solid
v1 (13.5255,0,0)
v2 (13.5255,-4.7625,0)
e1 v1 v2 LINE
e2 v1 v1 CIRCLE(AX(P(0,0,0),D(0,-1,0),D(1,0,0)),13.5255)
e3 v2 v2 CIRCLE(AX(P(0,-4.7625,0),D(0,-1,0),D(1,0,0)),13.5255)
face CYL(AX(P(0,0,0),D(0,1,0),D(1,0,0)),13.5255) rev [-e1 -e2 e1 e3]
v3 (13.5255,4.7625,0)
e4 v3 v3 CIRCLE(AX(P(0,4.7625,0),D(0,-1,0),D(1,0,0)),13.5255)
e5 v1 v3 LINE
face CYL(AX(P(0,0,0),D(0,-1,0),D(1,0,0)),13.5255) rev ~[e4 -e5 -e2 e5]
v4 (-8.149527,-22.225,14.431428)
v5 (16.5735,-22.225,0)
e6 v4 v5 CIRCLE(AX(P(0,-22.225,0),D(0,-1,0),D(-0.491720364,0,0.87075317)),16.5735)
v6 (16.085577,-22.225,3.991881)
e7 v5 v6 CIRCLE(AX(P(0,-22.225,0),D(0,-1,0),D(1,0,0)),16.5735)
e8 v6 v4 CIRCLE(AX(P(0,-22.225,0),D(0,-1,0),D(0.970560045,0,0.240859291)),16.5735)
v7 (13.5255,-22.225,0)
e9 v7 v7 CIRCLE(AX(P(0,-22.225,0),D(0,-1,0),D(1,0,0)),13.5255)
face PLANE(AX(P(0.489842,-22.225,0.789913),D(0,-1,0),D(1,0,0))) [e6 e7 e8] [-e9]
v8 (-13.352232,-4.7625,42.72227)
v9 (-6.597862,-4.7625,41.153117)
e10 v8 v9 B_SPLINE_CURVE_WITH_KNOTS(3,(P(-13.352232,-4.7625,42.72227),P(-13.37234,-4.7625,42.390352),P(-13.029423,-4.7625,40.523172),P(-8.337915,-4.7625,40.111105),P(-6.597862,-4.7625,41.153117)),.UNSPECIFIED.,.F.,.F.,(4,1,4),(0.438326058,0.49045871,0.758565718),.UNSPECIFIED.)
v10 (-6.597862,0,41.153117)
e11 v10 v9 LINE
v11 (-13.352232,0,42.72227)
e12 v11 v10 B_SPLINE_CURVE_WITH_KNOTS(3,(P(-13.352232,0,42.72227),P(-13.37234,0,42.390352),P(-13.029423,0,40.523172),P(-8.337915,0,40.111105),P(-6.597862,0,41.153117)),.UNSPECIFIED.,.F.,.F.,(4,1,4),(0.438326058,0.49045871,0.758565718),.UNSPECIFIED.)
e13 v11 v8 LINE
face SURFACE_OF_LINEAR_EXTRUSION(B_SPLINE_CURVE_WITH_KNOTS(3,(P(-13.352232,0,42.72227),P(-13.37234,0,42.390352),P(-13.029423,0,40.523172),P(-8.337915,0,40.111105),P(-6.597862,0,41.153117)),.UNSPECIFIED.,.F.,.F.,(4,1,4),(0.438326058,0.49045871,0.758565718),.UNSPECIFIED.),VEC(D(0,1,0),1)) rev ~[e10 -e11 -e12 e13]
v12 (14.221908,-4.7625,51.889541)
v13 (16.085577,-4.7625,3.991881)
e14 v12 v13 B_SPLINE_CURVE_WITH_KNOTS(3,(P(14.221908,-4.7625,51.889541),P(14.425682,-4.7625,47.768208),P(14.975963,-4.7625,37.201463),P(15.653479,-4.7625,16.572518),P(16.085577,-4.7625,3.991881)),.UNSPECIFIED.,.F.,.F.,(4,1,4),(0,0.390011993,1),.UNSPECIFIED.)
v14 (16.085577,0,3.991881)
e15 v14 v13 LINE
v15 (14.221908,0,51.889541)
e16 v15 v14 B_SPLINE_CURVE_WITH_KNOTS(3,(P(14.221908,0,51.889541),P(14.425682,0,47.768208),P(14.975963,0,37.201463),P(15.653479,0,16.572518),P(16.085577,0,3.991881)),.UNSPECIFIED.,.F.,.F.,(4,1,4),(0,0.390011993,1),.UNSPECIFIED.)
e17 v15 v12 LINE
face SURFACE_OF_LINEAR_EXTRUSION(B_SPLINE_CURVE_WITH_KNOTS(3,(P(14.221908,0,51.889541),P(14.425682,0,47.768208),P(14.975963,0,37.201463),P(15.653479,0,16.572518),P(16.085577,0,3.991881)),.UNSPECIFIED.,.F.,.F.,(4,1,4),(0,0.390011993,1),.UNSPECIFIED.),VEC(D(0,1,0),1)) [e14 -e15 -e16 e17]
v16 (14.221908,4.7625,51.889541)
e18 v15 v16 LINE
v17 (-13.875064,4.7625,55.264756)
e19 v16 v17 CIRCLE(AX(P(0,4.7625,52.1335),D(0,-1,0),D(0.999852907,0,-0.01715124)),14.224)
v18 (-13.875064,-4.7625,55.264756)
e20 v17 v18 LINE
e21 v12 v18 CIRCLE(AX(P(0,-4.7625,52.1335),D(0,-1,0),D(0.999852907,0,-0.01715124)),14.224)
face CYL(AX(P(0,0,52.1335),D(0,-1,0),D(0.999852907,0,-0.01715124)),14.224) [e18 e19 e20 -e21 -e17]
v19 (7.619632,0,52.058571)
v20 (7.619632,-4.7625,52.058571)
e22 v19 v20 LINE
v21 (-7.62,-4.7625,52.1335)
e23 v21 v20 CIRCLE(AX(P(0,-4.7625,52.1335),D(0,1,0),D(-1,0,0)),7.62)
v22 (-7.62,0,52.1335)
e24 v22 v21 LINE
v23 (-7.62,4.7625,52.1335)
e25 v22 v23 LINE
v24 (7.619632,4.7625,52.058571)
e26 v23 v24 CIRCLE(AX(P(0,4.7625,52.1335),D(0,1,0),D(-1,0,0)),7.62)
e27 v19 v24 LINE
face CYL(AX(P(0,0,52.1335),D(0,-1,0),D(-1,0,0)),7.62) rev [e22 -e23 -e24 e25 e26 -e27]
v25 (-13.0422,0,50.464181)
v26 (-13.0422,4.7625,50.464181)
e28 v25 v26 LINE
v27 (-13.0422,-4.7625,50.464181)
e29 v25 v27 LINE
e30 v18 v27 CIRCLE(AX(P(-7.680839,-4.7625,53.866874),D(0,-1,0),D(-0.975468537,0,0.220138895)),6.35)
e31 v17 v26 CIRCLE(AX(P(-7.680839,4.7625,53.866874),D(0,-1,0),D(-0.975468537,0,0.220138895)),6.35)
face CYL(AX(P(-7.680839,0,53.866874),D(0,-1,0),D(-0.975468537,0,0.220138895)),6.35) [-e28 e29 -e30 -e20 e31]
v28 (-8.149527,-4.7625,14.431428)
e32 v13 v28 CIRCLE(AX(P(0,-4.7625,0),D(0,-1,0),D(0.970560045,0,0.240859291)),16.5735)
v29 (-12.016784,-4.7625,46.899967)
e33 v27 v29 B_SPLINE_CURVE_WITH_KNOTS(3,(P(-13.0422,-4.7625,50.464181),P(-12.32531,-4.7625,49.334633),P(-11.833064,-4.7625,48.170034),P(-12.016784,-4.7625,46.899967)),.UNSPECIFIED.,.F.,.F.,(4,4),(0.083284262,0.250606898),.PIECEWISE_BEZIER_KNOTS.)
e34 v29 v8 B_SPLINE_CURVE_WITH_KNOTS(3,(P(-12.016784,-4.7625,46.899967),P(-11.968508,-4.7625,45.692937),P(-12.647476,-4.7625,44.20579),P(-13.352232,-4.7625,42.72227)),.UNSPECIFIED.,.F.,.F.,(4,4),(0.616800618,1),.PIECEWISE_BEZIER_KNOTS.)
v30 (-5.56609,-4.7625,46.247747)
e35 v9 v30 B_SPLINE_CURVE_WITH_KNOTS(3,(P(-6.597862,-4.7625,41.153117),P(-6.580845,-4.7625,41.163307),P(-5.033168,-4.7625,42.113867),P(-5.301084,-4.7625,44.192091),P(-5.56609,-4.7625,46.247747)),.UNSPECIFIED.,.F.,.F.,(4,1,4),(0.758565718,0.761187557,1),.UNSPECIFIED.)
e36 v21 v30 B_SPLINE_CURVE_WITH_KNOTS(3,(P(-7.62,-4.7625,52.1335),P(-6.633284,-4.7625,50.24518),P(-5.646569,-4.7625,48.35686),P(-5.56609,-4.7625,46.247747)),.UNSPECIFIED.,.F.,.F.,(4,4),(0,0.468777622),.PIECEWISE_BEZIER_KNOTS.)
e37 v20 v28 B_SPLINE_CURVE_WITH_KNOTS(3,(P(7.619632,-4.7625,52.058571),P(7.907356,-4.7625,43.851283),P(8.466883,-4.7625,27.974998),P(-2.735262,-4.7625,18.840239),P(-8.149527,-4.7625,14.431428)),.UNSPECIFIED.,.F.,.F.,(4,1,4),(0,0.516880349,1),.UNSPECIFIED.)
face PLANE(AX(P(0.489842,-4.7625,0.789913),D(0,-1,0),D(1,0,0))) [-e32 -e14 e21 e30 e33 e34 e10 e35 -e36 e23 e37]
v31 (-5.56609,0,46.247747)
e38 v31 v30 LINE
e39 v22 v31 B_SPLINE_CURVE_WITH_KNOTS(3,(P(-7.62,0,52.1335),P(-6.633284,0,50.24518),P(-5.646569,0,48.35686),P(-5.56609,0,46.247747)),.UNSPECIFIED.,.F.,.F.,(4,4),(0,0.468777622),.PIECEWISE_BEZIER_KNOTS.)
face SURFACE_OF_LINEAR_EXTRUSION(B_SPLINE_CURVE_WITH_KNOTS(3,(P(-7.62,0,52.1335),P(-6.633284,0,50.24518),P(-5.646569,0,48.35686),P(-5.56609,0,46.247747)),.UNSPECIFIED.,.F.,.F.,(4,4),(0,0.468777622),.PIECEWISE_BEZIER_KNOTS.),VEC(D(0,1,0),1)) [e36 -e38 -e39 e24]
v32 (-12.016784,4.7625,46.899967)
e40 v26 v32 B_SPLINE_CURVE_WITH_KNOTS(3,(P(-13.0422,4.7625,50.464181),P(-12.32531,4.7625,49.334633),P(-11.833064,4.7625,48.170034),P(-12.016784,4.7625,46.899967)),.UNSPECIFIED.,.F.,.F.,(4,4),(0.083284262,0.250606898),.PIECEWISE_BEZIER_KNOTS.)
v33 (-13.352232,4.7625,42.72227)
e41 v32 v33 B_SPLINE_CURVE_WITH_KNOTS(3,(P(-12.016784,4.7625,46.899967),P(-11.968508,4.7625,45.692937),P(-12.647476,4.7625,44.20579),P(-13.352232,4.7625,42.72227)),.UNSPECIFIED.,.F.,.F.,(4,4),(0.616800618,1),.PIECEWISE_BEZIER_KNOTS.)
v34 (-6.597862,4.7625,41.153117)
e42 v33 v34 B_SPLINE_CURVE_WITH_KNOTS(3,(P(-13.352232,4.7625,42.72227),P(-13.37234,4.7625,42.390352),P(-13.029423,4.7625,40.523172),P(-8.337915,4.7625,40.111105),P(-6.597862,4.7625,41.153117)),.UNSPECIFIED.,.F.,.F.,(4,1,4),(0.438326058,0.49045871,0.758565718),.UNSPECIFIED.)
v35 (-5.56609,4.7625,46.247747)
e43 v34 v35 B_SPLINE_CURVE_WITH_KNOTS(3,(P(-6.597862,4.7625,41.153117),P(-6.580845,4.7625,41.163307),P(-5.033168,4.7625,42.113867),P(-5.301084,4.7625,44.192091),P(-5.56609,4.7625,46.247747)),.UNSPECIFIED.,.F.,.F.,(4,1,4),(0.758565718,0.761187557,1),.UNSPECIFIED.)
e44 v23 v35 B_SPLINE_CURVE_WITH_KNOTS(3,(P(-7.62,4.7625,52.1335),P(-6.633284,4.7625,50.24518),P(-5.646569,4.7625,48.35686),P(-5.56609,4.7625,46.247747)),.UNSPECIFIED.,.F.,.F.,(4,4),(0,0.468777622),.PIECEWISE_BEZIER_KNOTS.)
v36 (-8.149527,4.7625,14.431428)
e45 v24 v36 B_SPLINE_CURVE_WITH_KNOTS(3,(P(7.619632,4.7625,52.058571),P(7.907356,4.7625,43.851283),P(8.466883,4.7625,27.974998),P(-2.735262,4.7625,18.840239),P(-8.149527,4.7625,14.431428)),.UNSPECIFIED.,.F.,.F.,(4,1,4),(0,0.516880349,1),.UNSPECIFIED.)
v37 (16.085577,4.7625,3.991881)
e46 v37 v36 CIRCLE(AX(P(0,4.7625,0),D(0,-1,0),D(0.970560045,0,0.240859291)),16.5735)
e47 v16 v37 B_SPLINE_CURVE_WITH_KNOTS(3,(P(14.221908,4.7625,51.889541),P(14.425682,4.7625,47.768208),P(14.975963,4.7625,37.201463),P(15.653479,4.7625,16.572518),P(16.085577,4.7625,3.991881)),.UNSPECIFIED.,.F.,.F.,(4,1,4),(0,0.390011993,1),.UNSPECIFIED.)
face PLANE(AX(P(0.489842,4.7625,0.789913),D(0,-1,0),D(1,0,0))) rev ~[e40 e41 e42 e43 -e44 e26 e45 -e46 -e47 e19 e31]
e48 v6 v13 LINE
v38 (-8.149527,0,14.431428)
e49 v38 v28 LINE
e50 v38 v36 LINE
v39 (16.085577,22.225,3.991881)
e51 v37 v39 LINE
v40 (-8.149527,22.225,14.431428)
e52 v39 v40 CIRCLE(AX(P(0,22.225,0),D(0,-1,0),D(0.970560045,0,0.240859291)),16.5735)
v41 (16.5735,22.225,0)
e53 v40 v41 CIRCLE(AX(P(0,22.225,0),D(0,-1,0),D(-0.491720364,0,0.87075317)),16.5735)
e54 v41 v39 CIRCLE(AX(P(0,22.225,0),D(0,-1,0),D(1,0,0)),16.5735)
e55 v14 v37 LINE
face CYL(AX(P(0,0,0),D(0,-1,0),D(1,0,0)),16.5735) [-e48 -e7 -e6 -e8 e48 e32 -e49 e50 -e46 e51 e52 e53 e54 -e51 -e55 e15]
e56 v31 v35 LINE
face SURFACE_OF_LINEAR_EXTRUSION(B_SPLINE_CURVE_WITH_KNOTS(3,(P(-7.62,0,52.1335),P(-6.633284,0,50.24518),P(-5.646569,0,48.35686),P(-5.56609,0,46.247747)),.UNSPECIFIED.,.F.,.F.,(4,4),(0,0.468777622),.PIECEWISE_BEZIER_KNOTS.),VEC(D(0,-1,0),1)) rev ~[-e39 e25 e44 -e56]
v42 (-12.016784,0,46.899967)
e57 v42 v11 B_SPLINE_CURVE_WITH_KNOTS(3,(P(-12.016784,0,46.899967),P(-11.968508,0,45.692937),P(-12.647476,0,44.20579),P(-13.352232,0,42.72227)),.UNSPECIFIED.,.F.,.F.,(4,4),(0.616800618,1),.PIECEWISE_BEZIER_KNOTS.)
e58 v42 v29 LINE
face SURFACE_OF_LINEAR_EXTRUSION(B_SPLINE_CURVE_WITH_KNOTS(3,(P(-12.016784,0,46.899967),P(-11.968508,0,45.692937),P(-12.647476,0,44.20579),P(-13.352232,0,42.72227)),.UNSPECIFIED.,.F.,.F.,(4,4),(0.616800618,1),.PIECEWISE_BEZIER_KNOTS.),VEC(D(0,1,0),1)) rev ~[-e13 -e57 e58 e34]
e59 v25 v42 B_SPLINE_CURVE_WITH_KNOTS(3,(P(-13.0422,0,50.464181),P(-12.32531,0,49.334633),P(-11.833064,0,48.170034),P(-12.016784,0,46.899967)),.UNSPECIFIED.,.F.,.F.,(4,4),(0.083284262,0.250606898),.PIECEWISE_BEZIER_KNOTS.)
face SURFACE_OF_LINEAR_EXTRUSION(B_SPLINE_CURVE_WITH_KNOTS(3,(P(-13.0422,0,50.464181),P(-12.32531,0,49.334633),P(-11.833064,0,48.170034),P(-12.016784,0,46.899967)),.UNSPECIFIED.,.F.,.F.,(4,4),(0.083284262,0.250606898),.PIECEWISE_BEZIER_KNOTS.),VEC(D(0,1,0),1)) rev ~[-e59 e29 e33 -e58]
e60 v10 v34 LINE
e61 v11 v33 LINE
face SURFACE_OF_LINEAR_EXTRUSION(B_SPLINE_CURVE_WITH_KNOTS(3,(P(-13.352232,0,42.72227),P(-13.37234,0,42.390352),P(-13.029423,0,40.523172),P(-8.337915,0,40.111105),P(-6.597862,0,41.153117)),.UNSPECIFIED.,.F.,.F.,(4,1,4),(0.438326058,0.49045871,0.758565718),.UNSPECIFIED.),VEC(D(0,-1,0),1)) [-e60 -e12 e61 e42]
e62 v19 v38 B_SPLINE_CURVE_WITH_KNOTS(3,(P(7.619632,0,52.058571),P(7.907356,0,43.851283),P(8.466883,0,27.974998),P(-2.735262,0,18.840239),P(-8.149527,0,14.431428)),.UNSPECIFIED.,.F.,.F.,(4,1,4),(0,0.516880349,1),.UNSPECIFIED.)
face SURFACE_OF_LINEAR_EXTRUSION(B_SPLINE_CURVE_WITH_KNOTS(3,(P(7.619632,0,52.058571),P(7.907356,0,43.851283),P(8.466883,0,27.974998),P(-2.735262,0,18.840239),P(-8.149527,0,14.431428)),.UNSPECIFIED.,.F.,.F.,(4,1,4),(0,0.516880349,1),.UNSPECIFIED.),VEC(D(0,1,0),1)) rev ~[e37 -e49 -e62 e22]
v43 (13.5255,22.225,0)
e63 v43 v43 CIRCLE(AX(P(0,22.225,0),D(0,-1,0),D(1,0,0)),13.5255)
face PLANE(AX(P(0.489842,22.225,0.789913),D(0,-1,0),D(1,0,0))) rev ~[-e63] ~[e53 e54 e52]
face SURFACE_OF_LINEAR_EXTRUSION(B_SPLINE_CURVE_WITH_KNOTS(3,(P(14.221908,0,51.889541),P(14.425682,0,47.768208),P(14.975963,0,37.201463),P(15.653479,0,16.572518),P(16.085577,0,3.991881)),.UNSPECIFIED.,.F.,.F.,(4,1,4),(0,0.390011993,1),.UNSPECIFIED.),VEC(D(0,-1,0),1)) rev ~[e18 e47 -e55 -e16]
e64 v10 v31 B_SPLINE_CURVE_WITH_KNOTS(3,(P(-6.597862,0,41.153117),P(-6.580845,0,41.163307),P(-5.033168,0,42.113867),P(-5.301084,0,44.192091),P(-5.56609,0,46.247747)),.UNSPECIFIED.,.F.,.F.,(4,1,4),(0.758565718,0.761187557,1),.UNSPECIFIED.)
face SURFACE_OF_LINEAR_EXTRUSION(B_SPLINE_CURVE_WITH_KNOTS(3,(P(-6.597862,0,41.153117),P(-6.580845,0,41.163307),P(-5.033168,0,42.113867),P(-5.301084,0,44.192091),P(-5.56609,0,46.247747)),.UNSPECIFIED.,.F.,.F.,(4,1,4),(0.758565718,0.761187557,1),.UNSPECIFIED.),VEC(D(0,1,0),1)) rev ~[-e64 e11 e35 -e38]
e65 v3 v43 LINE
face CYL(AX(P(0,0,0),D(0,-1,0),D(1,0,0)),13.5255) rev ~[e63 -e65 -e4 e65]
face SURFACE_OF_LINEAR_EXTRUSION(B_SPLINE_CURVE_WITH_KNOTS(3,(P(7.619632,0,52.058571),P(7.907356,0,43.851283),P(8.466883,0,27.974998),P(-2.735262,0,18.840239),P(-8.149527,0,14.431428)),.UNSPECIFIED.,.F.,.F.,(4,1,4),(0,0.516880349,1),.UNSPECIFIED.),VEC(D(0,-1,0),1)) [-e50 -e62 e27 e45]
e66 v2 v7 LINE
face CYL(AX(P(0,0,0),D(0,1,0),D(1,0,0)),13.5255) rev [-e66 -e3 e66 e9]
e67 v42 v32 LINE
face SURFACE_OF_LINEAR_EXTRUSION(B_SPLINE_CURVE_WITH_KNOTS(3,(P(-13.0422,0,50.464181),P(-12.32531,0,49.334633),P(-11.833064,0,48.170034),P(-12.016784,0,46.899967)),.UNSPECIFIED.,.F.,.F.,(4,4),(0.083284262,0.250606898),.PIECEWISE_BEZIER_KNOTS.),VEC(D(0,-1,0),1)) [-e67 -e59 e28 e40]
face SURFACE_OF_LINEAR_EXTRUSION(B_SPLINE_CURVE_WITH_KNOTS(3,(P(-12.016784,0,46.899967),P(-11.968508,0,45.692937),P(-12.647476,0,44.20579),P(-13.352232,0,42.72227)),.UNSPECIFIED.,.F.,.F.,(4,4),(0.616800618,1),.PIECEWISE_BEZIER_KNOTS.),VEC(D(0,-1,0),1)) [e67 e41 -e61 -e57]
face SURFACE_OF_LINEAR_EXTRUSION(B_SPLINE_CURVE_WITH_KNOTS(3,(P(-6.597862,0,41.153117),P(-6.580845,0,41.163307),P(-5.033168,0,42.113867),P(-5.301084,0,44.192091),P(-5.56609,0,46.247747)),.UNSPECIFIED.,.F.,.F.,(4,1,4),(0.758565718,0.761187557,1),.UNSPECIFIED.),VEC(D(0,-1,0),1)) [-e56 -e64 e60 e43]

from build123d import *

# Parameters (mm, degrees)
F0_R     = 13.5255
F1_DEPTH = 22.225
F2_DEPTH = 4.7625


with BuildPart() as f1:
    # F0 (on Front) → F1 (new body, symmetric)
    with BuildSketch(Plane.XZ):
        with BuildLine():
            ThreePointArc((16.0855769131, 3.991881464), (6.5567714231, 15.2213550893), (-8.1495274532, 14.4314276681))
            ThreePointArc((-8.1495274532, 14.4314276681), (-8.3550795629, -14.3134044779), (16.5735, 0))
            ThreePointArc((16.5735, 0), (16.4510670052, 2.0107950269), (16.0855769131, 3.991881464))
        make_face()
        Circle(F0_R, mode=Mode.SUBTRACT)
    extrude(amount=F1_DEPTH, both=True)

    # F0 (on Front) → F2 (join, symmetric)
    with BuildSketch(Plane.XZ):
        with BuildLine():
            ThreePointArc((16.0855769131, 3.991881464), (6.5567714231, 15.2213550893), (-8.1495274532, 14.4314276681))
            ThreePointArc((-8.1495274532, 14.4314276681), (-8.3550795629, -14.3134044779), (16.5735, 0))
            ThreePointArc((16.5735, 0), (16.4510670052, 2.0107950269), (16.0855769131, 3.991881464))
        make_face()
        Circle(F0_R, mode=Mode.SUBTRACT)
        with BuildLine():
            add(Edge.make_bspline(
                [(7.6196315943, 52.0585709196), (7.9073561804, 43.8512833929), (8.4668828165, 27.9749976478), (-2.735262235, 18.8402392219), (-8.1495274532, 14.4314276681)],
                knots=[0, 0, 0, 0, 0.5168803488, 1, 1, 1, 1], degree=3))
            ThreePointArc((-8.1495274532, 14.4314276681), (6.5567714231, 15.2213550893), (16.0855769131, 3.991881464))
            add(Edge.make_bspline(
                [(14.2219077444, 51.8895407599), (14.4256822763, 47.7682077132), (14.9759634895, 37.2014626867), (15.653478831, 16.5725180559), (16.0855769131, 3.991881464)],
                knots=[0, 0, 0, 0, 0.3900119934, 1, 1, 1, 1], degree=3))
            ThreePointArc((14.2219077444, 51.8895407599), (1.6964946006, 66.2559672798), (-13.8750644733, 55.2647556367))
            ThreePointArc((-13.8750644733, 55.2647556367), (-13.937377269, 52.7814096229), (-13.0421995878, 50.4641812725))
            add(Edge.make_bspline(
                [(-13.0421995878, 50.4641812725), (-12.3253096001, 49.3346329312), (-11.8330637514, 48.1700341933), (-12.0167843997, 46.8999668956)],
                knots=[0.0832842621, 0.0832842621, 0.0832842621, 0.0832842621, 0.2506068983, 0.2506068983, 0.2506068983, 0.2506068983], degree=3))
            add(Edge.make_bspline(
                [(-12.0167843975, 46.8999668404), (-11.9685081536, 45.6929371066), (-12.6474764459, 44.2057904092), (-13.352232419, 42.7222704399)],
                knots=[0.6168006178, 0.6168006178, 0.6168006178, 0.6168006178, 1, 1, 1, 1], degree=3))
            add(Edge.make_bspline(
                [(-13.352232419, 42.7222704399), (-13.3723404879, 42.3903517549), (-13.0294229695, 40.5231715226), (-8.3379146473, 40.1111053623), (-6.5978615691, 41.1531167984)],
                knots=[0.4383260576, 0.4383260576, 0.4383260576, 0.4383260576, 0.4904587097, 0.7585657185, 0.7585657185, 0.7585657185, 0.7585657185], degree=3))
            add(Edge.make_bspline(
                [(-5.5660903454, 46.2477467954), (-5.5050556705, 44.6482001002), (-5.9652585792, 42.9216600644), (-6.5978615691, 41.1531167984)],
                knots=[0.4687776215, 0.4687776215, 0.4687776215, 0.4687776215, 0.8242974336, 0.8242974336, 0.8242974336, 0.8242974336], degree=3))
            add(Edge.make_bspline(
                [(-7.62, 52.1335), (-6.6332844065, 50.2451802325), (-5.6465688131, 48.356860465), (-5.5660903454, 46.2477467954)],
                knots=[0, 0, 0, 0, 0.4687776215, 0.4687776215, 0.4687776215, 0.4687776215], degree=3))
            ThreePointArc((-7.62, 52.1335), (0.037464993, 59.753407898), (7.6196315943, 52.0585709196))
        make_face()
        with BuildLine():
            add(Edge.make_bspline(
                [(-6.5978615691, 41.1531167984), (-6.5808454576, 41.1633067076), (-5.0331676538, 42.1138674091), (-5.3010837075, 44.1920912662), (-5.5660903454, 46.2477467954)],
                knots=[0.7585657185, 0.7585657185, 0.7585657185, 0.7585657185, 0.7611875574, 1, 1, 1, 1], degree=3))
            add(Edge.make_bspline(
                [(-5.5660903454, 46.2477467954), (-5.5050556705, 44.6482001002), (-5.9652585792, 42.9216600644), (-6.5978615691, 41.1531167984)],
                knots=[0.4687776215, 0.4687776215, 0.4687776215, 0.4687776215, 0.8242974336, 0.8242974336, 0.8242974336, 0.8242974336], degree=3))
        make_face()
    extrude(amount=F2_DEPTH, both=True)


solid = f1.part
